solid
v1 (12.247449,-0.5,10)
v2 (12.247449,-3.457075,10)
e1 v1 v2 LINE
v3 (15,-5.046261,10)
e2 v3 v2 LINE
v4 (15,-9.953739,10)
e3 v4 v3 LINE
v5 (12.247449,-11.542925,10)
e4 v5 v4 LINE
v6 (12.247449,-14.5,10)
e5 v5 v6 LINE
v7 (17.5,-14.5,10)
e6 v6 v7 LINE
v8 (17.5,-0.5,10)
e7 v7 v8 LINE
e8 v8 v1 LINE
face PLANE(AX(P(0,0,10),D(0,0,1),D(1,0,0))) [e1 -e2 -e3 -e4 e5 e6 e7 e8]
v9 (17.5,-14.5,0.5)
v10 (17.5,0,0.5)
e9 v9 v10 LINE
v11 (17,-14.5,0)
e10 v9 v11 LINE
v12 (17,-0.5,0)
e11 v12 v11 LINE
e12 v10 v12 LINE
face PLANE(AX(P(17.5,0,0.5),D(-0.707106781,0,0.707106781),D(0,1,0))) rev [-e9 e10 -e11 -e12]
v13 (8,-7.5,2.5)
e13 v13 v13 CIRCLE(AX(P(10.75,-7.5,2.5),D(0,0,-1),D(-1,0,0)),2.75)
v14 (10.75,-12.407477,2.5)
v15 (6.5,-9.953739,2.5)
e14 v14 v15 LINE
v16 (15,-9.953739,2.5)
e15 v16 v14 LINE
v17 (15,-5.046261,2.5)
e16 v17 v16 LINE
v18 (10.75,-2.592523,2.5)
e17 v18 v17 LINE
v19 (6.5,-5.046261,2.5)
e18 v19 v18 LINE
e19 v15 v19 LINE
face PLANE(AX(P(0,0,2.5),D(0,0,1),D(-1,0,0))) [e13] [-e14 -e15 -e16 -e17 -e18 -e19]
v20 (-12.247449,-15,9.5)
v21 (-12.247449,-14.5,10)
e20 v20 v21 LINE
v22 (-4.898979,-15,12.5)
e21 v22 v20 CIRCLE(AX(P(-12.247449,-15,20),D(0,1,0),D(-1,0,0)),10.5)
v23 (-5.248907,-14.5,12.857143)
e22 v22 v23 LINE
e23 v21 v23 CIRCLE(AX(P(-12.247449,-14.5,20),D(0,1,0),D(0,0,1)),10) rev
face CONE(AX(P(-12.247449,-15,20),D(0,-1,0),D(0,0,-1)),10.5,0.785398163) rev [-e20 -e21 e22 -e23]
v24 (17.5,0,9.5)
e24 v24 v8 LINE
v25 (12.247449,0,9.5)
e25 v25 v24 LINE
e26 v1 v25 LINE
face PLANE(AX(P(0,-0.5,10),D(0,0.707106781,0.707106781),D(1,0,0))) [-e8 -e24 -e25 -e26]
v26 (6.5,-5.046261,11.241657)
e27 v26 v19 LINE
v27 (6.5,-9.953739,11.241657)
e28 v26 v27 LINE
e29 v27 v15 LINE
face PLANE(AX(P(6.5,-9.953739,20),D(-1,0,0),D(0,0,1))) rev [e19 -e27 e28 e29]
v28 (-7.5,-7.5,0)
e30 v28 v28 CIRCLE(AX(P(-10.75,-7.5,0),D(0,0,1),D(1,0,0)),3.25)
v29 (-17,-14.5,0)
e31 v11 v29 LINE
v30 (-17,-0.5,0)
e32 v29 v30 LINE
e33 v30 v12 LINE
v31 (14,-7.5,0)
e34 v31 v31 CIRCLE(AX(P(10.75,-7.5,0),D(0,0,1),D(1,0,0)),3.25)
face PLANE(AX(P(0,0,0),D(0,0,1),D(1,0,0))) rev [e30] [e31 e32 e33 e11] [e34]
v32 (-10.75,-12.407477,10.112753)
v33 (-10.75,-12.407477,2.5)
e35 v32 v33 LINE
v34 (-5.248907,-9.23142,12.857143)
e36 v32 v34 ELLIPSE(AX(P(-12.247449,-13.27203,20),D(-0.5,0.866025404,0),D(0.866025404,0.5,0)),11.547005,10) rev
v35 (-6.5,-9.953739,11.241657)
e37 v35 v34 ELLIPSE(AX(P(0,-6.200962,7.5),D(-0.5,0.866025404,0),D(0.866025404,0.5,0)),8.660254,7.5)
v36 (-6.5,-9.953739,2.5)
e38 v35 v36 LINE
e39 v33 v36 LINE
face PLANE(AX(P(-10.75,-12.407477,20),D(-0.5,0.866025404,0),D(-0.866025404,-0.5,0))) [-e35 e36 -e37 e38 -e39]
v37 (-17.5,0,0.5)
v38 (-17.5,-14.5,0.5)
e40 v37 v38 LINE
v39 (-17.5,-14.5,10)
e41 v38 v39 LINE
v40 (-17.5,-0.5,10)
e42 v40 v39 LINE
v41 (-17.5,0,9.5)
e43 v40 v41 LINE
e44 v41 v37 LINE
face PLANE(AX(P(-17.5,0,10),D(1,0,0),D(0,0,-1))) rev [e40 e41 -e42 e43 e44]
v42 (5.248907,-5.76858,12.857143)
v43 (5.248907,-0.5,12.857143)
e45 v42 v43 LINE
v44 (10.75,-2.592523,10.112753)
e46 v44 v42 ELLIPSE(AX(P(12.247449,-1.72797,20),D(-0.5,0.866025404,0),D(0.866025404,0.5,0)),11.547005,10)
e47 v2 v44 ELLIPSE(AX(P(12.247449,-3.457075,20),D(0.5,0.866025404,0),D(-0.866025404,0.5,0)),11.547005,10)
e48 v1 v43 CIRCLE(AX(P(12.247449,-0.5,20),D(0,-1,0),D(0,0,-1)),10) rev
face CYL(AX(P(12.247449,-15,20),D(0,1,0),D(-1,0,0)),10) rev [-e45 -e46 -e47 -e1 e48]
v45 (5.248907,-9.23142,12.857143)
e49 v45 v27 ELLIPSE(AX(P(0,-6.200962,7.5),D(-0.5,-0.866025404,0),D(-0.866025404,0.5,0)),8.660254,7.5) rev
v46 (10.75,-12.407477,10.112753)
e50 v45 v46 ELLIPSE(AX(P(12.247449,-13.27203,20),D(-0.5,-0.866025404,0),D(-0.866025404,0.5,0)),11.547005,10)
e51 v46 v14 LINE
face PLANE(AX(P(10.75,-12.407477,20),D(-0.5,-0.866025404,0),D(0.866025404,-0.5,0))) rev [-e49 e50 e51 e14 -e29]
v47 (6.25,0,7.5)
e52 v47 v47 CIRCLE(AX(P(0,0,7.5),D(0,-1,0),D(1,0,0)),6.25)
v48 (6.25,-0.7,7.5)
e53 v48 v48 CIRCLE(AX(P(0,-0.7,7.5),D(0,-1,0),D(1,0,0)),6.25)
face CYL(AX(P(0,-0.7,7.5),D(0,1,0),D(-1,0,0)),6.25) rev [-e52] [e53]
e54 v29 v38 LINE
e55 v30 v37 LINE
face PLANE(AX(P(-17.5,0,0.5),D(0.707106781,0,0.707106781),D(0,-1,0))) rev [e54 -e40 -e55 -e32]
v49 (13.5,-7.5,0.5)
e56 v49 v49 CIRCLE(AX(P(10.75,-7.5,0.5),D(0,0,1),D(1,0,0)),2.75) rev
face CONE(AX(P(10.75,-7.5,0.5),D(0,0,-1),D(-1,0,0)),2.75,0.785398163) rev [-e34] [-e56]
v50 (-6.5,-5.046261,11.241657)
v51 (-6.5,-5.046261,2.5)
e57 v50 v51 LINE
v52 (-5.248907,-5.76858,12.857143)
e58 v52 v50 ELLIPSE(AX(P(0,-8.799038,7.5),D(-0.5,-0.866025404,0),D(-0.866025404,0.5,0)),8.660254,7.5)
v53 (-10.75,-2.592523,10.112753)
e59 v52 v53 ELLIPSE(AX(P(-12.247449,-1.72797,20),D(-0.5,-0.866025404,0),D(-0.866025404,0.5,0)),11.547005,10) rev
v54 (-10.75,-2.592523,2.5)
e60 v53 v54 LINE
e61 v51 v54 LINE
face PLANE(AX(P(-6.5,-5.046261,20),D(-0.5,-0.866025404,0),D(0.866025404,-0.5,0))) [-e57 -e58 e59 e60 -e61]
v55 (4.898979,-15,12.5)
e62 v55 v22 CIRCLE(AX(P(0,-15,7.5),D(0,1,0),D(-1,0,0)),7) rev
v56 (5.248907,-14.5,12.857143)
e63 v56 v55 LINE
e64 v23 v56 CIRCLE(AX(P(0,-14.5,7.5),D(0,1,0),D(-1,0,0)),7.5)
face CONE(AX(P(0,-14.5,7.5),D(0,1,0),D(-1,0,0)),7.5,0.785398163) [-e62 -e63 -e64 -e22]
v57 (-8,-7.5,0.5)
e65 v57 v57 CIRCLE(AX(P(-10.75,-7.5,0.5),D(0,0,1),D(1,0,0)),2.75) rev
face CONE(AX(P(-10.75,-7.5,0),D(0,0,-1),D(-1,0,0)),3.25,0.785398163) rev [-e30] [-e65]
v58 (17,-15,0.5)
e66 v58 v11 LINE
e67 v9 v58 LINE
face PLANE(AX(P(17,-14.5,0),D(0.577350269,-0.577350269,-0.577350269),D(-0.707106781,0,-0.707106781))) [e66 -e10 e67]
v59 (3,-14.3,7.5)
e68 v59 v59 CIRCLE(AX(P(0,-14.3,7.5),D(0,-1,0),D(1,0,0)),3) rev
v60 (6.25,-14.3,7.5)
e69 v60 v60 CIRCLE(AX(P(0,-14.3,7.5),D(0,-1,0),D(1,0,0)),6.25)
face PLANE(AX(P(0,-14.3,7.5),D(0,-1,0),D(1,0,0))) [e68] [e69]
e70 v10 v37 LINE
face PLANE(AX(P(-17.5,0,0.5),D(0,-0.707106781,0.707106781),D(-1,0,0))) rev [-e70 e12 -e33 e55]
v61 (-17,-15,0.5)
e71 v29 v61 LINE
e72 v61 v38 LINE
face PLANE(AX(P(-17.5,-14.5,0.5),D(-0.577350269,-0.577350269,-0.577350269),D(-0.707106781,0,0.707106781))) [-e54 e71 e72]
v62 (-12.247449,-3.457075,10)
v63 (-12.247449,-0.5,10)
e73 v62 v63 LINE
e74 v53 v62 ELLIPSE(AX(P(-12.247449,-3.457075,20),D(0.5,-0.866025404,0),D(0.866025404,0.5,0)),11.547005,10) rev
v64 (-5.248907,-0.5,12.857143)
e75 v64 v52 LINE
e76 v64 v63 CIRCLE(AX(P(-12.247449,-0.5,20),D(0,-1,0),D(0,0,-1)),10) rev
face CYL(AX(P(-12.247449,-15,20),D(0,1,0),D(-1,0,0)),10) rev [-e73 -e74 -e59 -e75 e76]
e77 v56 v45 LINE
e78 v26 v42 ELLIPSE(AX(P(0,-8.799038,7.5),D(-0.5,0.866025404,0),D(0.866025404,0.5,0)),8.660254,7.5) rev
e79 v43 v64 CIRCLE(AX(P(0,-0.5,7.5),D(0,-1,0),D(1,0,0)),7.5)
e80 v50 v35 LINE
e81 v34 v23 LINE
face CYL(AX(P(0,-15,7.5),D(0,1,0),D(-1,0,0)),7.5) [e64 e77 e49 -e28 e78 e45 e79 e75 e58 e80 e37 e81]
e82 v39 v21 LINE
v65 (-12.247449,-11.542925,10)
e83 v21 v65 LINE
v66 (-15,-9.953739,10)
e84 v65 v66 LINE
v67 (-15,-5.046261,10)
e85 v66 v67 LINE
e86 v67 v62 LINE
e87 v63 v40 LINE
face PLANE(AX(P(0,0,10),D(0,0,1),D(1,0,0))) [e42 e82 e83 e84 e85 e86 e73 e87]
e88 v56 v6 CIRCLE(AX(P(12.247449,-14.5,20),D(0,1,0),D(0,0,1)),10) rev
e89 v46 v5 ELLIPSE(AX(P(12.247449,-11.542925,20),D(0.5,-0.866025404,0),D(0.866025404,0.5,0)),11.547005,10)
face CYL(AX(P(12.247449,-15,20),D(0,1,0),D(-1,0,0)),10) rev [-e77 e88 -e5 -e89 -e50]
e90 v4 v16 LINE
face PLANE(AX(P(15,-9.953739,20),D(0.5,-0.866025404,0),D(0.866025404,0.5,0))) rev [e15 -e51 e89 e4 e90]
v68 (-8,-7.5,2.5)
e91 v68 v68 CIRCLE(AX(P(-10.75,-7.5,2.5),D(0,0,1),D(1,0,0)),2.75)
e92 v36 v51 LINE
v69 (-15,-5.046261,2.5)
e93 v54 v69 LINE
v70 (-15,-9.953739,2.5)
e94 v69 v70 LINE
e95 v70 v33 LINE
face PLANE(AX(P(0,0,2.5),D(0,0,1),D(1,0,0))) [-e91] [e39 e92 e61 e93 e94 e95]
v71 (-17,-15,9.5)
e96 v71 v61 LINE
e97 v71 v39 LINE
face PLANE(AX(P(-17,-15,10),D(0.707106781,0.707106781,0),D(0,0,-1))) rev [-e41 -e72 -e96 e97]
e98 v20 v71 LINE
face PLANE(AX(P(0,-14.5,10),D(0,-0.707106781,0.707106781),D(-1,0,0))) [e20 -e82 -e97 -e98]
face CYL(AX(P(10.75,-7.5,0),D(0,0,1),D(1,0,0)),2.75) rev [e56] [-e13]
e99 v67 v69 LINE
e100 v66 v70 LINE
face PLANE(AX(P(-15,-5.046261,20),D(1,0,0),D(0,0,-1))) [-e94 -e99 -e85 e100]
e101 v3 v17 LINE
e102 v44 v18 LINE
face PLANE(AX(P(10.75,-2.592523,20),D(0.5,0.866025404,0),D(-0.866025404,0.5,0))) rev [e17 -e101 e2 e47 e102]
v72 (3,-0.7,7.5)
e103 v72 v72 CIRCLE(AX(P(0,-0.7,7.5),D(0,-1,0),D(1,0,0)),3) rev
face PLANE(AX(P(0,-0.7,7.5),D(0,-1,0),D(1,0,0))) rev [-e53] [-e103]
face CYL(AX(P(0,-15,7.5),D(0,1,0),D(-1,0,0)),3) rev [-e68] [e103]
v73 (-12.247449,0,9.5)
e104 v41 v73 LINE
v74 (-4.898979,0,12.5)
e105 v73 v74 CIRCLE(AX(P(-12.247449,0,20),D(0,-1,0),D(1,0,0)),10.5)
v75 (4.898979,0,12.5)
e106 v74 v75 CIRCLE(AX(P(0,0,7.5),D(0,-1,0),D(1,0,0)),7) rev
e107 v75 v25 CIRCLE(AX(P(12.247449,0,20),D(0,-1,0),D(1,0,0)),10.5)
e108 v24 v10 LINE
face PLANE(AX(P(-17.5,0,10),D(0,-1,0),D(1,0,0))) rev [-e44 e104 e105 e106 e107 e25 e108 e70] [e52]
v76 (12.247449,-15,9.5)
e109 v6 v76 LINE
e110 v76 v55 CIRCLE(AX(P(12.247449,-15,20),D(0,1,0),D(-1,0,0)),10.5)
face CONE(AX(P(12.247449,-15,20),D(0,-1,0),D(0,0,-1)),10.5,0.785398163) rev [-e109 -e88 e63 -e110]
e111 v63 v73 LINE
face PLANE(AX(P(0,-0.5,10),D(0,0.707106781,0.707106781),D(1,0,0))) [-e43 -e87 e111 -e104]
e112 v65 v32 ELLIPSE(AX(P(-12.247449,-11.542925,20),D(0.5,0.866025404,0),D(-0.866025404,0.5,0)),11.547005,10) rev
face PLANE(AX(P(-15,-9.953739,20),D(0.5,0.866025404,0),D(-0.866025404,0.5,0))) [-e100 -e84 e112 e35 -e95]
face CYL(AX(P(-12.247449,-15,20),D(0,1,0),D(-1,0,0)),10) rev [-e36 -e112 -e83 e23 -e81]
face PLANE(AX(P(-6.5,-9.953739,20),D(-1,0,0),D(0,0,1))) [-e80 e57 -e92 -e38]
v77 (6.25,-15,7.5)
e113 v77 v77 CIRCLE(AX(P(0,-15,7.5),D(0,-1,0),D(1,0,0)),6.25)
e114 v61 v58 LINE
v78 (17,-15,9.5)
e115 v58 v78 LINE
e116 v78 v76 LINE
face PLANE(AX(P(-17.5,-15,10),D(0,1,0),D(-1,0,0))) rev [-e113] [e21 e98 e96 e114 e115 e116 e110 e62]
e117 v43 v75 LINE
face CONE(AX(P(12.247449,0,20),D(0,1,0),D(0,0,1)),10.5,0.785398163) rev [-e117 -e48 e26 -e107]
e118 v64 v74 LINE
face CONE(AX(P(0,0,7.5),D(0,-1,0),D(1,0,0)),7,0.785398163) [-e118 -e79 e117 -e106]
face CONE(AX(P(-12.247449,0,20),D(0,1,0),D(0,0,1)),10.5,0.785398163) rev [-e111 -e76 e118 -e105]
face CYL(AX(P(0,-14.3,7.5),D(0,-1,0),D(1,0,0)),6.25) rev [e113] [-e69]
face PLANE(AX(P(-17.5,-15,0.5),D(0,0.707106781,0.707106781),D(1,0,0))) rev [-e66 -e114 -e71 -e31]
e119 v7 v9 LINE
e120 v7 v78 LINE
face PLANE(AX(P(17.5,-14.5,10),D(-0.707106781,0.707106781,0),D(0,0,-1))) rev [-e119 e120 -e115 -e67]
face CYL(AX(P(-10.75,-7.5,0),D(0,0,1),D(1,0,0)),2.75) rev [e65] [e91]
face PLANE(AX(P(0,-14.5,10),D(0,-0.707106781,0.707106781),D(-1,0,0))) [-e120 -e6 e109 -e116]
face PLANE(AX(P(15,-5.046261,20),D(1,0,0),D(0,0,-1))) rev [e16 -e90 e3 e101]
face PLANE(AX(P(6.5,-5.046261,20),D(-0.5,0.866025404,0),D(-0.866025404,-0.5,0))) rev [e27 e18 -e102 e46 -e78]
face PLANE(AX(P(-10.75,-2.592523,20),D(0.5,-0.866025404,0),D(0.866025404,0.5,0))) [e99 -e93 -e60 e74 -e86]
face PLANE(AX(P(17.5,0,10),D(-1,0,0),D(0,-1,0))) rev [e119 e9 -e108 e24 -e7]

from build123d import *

# Parameters (mm, degrees)
SKETCH1_W           = 35
SKETCH1_H           = 15
BOSS_EXTRUDE1_DEPTH = 10
SKETCH3_R           = 7.5
BOSS_EXTRUDE2_DEPTH = 15
CUT_EXTRUDE1_START  = -7.5
CUT_EXTRUDE1_DEPTH  = 17.5
SKETCH5_R           = 2.75
CUT_EXTRUDE3_DEPTH  = 27.220221204
SKETCH4_R           = 3
CUT_EXTRUDE2_DEPTH  = 28.5
FILLET1_R           = 10
SKETCH6_R           = 6.25
CUT_EXTRUDE4_DEPTH  = 0.7
CUT_EXTRUDE5_START  = -14.3
SKETCH6_3_R         = 6.25
CUT_EXTRUDE5_DEPTH  = 0.7
CHAMFER1_SIZE       = 0.5


with BuildPart() as part:
    # Sketch1 → Boss-Extrude1 (new body)
    with BuildSketch(Plane.XY):
        with Locations((0, -7.5)):
            Rectangle(SKETCH1_W, SKETCH1_H)
    extrude(amount=BOSS_EXTRUDE1_DEPTH)

    # Sketch3 → Boss-Extrude2 (add, through all)
    with BuildSketch(Plane(origin=(0, 0, 0), x_dir=(1, 0, 0), z_dir=(0, 1, 0))):
        with Locations((0, -7.5)):
            Circle(SKETCH3_R)
    extrude(amount=-BOSS_EXTRUDE2_DEPTH)

    # Sketch2 → Cut-Extrude1 (cut)
    with BuildSketch(Plane.XY.offset(10).offset(CUT_EXTRUDE1_START)):
        Polygon((-10.75, -12.407477288), (-6.5, -9.953738644), (-6.5, -5.046261356), (-10.75, -2.592522712), (-15, -5.046261356), (-15, -9.953738644), align=None)
    cut_extrude1 = extrude(amount=CUT_EXTRUDE1_DEPTH, mode=Mode.SUBTRACT)

    # Sketch5 → Cut-Extrude3 (cut, through all)
    with BuildSketch(Plane.XY.offset(2.5)):
        with Locations((-10.75, -7.5)):
            Circle(SKETCH5_R)
    cut_extrude3 = extrude(amount=-CUT_EXTRUDE3_DEPTH, mode=Mode.SUBTRACT)

    # Mirror1: Cut-Extrude1, Cut-Extrude3 across plane
    add(cut_extrude1.mirror(Plane(origin=(0, 0, 0), x_dir=(0, 0, 1), z_dir=(1, 0, 0))), mode=Mode.SUBTRACT)
    add(cut_extrude3.mirror(Plane(origin=(0, 0, 0), x_dir=(0, 0, 1), z_dir=(1, 0, 0))), mode=Mode.SUBTRACT)

    # Sketch4 → Cut-Extrude2 (cut, through all)
    with BuildSketch(Plane(origin=(0, 0, 0), x_dir=(1, 0, 0), z_dir=(0, 1, 0))):
        with Locations(Location((0, -7.5, 0), (0, 0, 180))):
            Circle(SKETCH4_R)
    extrude(amount=-CUT_EXTRUDE2_DEPTH, mode=Mode.SUBTRACT)

    # Fillet1
    # the kernel refuses this fillet: 10 mm, written as the material it adds along each edge
    with BuildSketch(Plane(origin=(7.071067812, -17.657507456, 10), x_dir=(-0.5377110557824625, 0, 0.8431291837490323), z_dir=(0, 1, 0))) as fillet1_piece_1_section:
        with BuildLine():
            CenterArc((5.647894598, 9.741468363), FILLET1_R, 212.527956019, 44.415308597)
            Line((-2.78339724, 4.364357805), (0, 0))
            ThreePointArc((0, 0), (1.694368379, 0.193898728), (3.388736759, 0))
        make_face()
    fillet1_piece_1 = extrude(amount=30.598459711, mode=Mode.PRIVATE)
    fillet1_piece_1 = split(fillet1_piece_1, bisect_by=Plane(origin=(6.425815385, -15, 11.617899052), z_dir=(0, 1, 0)), keep=Keep.TOP, mode=Mode.PRIVATE)
    fillet1_piece_1 = split(fillet1_piece_1, bisect_by=Plane(origin=(8.608682251, -11.17118691, 11.617899052), z_dir=(-0.49999999999999994, -0.8660254037844389, 0)), keep=Keep.TOP, mode=Mode.PRIVATE)
    add(fillet1_piece_1)
    with BuildSketch(Plane(origin=(7.071067812, -17.657507456, 10), x_dir=(-0.5377110557824625, 0, 0.8431291837490323), z_dir=(0, 1, 0))) as fillet1_piece_2_section:
        with BuildLine():
            CenterArc((5.647894598, 9.741468363), FILLET1_R, 212.527956019, 44.415308597)
            Line((-2.78339724, 4.364357805), (0, 0))
            ThreePointArc((0, 0), (1.694368379, 0.193898728), (3.388736759, 0))
        make_face()
    fillet1_piece_2 = extrude(amount=30.598459711, mode=Mode.PRIVATE)
    fillet1_piece_2 = split(fillet1_piece_2, bisect_by=Plane(origin=(11.198944739, -12.666675654, 10.022508618), z_dir=(0.49999999999999994, 0.8660254037844389, 0)), keep=Keep.TOP, mode=Mode.PRIVATE)
    fillet1_piece_2 = split(fillet1_piece_2, bisect_by=Plane(origin=(11.198944739, -12.148278922, 10.022508618), z_dir=(0.49999999999999994, -0.8660254037844389, 0)), keep=Keep.TOP, mode=Mode.PRIVATE)
    add(fillet1_piece_2)
    with BuildSketch(Plane(origin=(7.071067812, -17.657507456, 10), x_dir=(-0.5377110557824625, 0, 0.8431291837490323), z_dir=(0, 1, 0))) as fillet1_piece_3_section:
        with BuildLine():
            CenterArc((5.647894598, 9.741468363), FILLET1_R, 212.527956019, 44.415308597)
            Line((-2.78339724, 4.364357805), (0, 0))
            ThreePointArc((0, 0), (1.694368379, 0.193898728), (3.388736759, 0))
        make_face()
    fillet1_piece_3 = extrude(amount=17.657507456, mode=Mode.PRIVATE)
    fillet1_piece_3 = split(fillet1_piece_3, bisect_by=Plane(origin=(7.311033897, -4.578010717, 11.885204444), z_dir=(-0.5000000000000009, 0.8660254037844383, 0)), keep=Keep.TOP, mode=Mode.PRIVATE)
    add(fillet1_piece_3)
    with BuildSketch(Plane(origin=(7.071067812, -17.657507456, 10), x_dir=(-0.5377110557824625, 0, 0.8431291837490323), z_dir=(0, 1, 0))) as fillet1_piece_4_section:
        with BuildLine():
            CenterArc((5.647894598, 9.741468363), FILLET1_R, 212.527956019, 44.415308597)
            Line((-2.78339724, 4.364357805), (0, 0))
            ThreePointArc((0, 0), (1.694368379, 0.193898728), (3.388736759, 0))
        make_face()
    fillet1_piece_4 = extrude(amount=30.598459711, mode=Mode.PRIVATE)
    fillet1_piece_4 = split(fillet1_piece_4, bisect_by=Plane(origin=(11.198944739, -2.333324346, 10.022508618), z_dir=(0.5000000000000009, -0.8660254037844383, 0)), keep=Keep.TOP, mode=Mode.PRIVATE)
    fillet1_piece_4 = split(fillet1_piece_4, bisect_by=Plane(origin=(11.198944739, -2.851721078, 10.022508618), z_dir=(0.5000000000000001, 0.8660254037844386, 0)), keep=Keep.TOP, mode=Mode.PRIVATE)
    add(fillet1_piece_4)
    with BuildSketch(Plane(origin=(-7.071067812, -17.657507456, 10), x_dir=(-1, 0, 0), z_dir=(0, 1, 0))) as fillet1_piece_5_section:
        with BuildLine():
            CenterArc((5.176380902, 10), FILLET1_R, 225.584691403, 44.415308597)
            ThreePointArc((-1.82216122, 2.857142857), (-0.747598934, 1.532832918), (0, 0))
            Line((0, 0), (5.176380902, 0))
        make_face()
    fillet1_piece_5 = extrude(amount=30.598459711, mode=Mode.PRIVATE)
    fillet1_piece_5 = split(fillet1_piece_5, bisect_by=Plane(origin=(-8.687576495, -15, 10.380647158), z_dir=(0, 1, 0)), keep=Keep.TOP, mode=Mode.PRIVATE)
    fillet1_piece_5 = split(fillet1_piece_5, bisect_by=Plane(origin=(-10.026133402, -11.989552713, 10.380647158), z_dir=(0.49999999999999994, -0.8660254037844389, 0)), keep=Keep.TOP, mode=Mode.PRIVATE)
    add(fillet1_piece_5)
    with BuildSketch(Plane(origin=(-7.071067812, -17.657507456, 10), x_dir=(-1, 0, 0), z_dir=(0, 1, 0))) as fillet1_piece_6_section:
        with BuildLine():
            CenterArc((5.176380902, 10), FILLET1_R, 225.584691403, 44.415308597)
            ThreePointArc((-1.82216122, 2.857142857), (-0.747598934, 1.532832918), (0, 0))
            Line((0, 0), (5.176380902, 0))
        make_face()
    fillet1_piece_6 = extrude(amount=30.598459711, mode=Mode.PRIVATE)
    fillet1_piece_6 = split(fillet1_piece_6, bisect_by=Plane(origin=(-11.19894474, -12.666675654, 10.022508618), z_dir=(-0.49999999999999994, 0.8660254037844389, 0)), keep=Keep.TOP, mode=Mode.PRIVATE)
    fillet1_piece_6 = split(fillet1_piece_6, bisect_by=Plane(origin=(-11.19894474, -12.148278922, 10.022508618), z_dir=(-0.49999999999999994, -0.8660254037844389, 0)), keep=Keep.TOP, mode=Mode.PRIVATE)
    add(fillet1_piece_6)
    with BuildSketch(Plane(origin=(-7.071067812, -17.657507456, 10), x_dir=(-1, 0, 0), z_dir=(0, 1, 0))) as fillet1_piece_7_section:
        with BuildLine():
            CenterArc((5.176380902, 10), FILLET1_R, 225.584691403, 44.415308597)
            ThreePointArc((-1.82216122, 2.857142857), (-0.747598934, 1.532832918), (0, 0))
            Line((0, 0), (5.176380902, 0))
        make_face()
    fillet1_piece_7 = extrude(amount=17.657507456, mode=Mode.PRIVATE)
    fillet1_piece_7 = split(fillet1_piece_7, bisect_by=Plane(origin=(-8.42018253, -3.937643455, 10.662510622), z_dir=(0.5000000000000009, 0.8660254037844383, 0)), keep=Keep.TOP, mode=Mode.PRIVATE)
    add(fillet1_piece_7)
    with BuildSketch(Plane(origin=(-7.071067812, -17.657507456, 10), x_dir=(-1, 0, 0), z_dir=(0, 1, 0))) as fillet1_piece_8_section:
        with BuildLine():
            CenterArc((5.176380902, 10), FILLET1_R, 225.584691403, 44.415308597)
            ThreePointArc((-1.82216122, 2.857142857), (-0.747598934, 1.532832918), (0, 0))
            Line((0, 0), (5.176380902, 0))
        make_face()
    fillet1_piece_8 = extrude(amount=30.598459711, mode=Mode.PRIVATE)
    fillet1_piece_8 = split(fillet1_piece_8, bisect_by=Plane(origin=(-11.19894474, -2.851721078, 10.022508618), z_dir=(-0.5000000000000001, 0.8660254037844386, 0)), keep=Keep.TOP, mode=Mode.PRIVATE)
    fillet1_piece_8 = split(fillet1_piece_8, bisect_by=Plane(origin=(-11.19894474, -2.333324346, 10.022508618), z_dir=(-0.5000000000000009, -0.8660254037844383, 0)), keep=Keep.TOP, mode=Mode.PRIVATE)
    add(fillet1_piece_8)
    with BuildSketch(Plane(origin=(-7.071067812, -15, 10), x_dir=(-1, 0, 0), z_dir=(0, 1, 0))) as fillet1_piece_9_section:
        with BuildLine():
            CenterArc((5.176380902, 10), FILLET1_R, 225.584691403, 44.415308597)
            ThreePointArc((-1.82216122, 2.857142857), (-0.747598934, 1.532832918), (0, 0))
            Line((0, 0), (5.176380902, 0))
        make_face()
    fillet1_piece_9 = extrude(amount=17.657507456, mode=Mode.PRIVATE)
    fillet1_piece_9 = split(fillet1_piece_9, bisect_by=Plane(origin=(-10.026133402, -11.989552713, 10.380647158), z_dir=(0.49999999999999994, -0.8660254037844389, 0)), keep=Keep.TOP, mode=Mode.PRIVATE)
    add(fillet1_piece_9)
    with BuildSketch(Plane(origin=(-7.071067812, -27.940952255, 10), x_dir=(-1, 0, 0), z_dir=(0, 1, 0))) as fillet1_piece_10_section:
        with BuildLine():
            CenterArc((5.176380902, 10), FILLET1_R, 225.584691403, 44.415308597)
            ThreePointArc((-1.82216122, 2.857142857), (-0.747598934, 1.532832918), (0, 0))
            Line((0, 0), (5.176380902, 0))
        make_face()
    fillet1_piece_10 = extrude(amount=30.598459711, mode=Mode.PRIVATE)
    fillet1_piece_10 = split(fillet1_piece_10, bisect_by=Plane(origin=(-11.19894474, -12.666675654, 10.022508618), z_dir=(-0.49999999999999994, 0.8660254037844389, 0)), keep=Keep.TOP, mode=Mode.PRIVATE)
    fillet1_piece_10 = split(fillet1_piece_10, bisect_by=Plane(origin=(-11.19894474, -12.148278922, 10.022508618), z_dir=(-0.49999999999999994, -0.8660254037844389, 0)), keep=Keep.TOP, mode=Mode.PRIVATE)
    add(fillet1_piece_10)
    with BuildSketch(Plane(origin=(-7.071067812, -27.940952255, 10), x_dir=(-1, 0, 0), z_dir=(0, 1, 0))) as fillet1_piece_11_section:
        with BuildLine():
            CenterArc((5.176380902, 10), FILLET1_R, 225.584691403, 44.415308597)
            ThreePointArc((-1.82216122, 2.857142857), (-0.747598934, 1.532832918), (0, 0))
            Line((0, 0), (5.176380902, 0))
        make_face()
    fillet1_piece_11 = extrude(amount=30.598459711, mode=Mode.PRIVATE)
    fillet1_piece_11 = split(fillet1_piece_11, bisect_by=Plane(origin=(-7.643576707, 0, 10.662510622), z_dir=(0, -1, 0)), keep=Keep.TOP, mode=Mode.PRIVATE)
    fillet1_piece_11 = split(fillet1_piece_11, bisect_by=Plane(origin=(-8.42018253, -3.937643455, 10.662510622), z_dir=(0.5000000000000009, 0.8660254037844383, 0)), keep=Keep.TOP, mode=Mode.PRIVATE)
    add(fillet1_piece_11)
    with BuildSketch(Plane(origin=(-7.071067812, -27.940952255, 10), x_dir=(-1, 0, 0), z_dir=(0, 1, 0))) as fillet1_piece_12_section:
        with BuildLine():
            CenterArc((5.176380902, 10), FILLET1_R, 225.584691403, 44.415308597)
            ThreePointArc((-1.82216122, 2.857142857), (-0.747598934, 1.532832918), (0, 0))
            Line((0, 0), (5.176380902, 0))
        make_face()
    fillet1_piece_12 = extrude(amount=30.598459711, mode=Mode.PRIVATE)
    fillet1_piece_12 = split(fillet1_piece_12, bisect_by=Plane(origin=(-11.19894474, -2.851721078, 10.022508618), z_dir=(-0.5000000000000001, 0.8660254037844386, 0)), keep=Keep.TOP, mode=Mode.PRIVATE)
    fillet1_piece_12 = split(fillet1_piece_12, bisect_by=Plane(origin=(-11.19894474, -2.333324346, 10.022508618), z_dir=(-0.5000000000000009, -0.8660254037844383, 0)), keep=Keep.TOP, mode=Mode.PRIVATE)
    add(fillet1_piece_12)
    with BuildSketch(Plane(origin=(7.071067812, -15, 10), x_dir=(-0.537711055782462, 0, 0.8431291837490327), z_dir=(0, 1, 0))) as fillet1_piece_13_section:
        with BuildLine():
            CenterArc((5.647894598, 9.741468363), FILLET1_R, 212.527956019, 44.415308597)
            Line((-2.78339724, 4.364357805), (0, 0))
            ThreePointArc((0, 0), (1.694368379, 0.193898728), (3.388736759, 0))
        make_face()
    fillet1_piece_13 = extrude(amount=17.657507456, mode=Mode.PRIVATE)
    fillet1_piece_13 = split(fillet1_piece_13, bisect_by=Plane(origin=(8.608682251, -11.17118691, 11.617899052), z_dir=(-0.49999999999999994, -0.8660254037844389, 0)), keep=Keep.TOP, mode=Mode.PRIVATE)
    add(fillet1_piece_13)
    with BuildSketch(Plane(origin=(7.071067812, -27.940952255, 10), x_dir=(-0.5377110557824618, 0, 0.8431291837490328), z_dir=(0, 1, 0))) as fillet1_piece_14_section:
        with BuildLine():
            CenterArc((5.647894598, 9.741468363), FILLET1_R, 212.527956019, 44.415308597)
            Line((-2.78339724, 4.364357805), (0, 0))
            ThreePointArc((0, 0), (1.694368379, 0.193898728), (3.388736759, 0))
        make_face()
    fillet1_piece_14 = extrude(amount=30.598459711, mode=Mode.PRIVATE)
    fillet1_piece_14 = split(fillet1_piece_14, bisect_by=Plane(origin=(11.198944739, -12.666675654, 10.022508618), z_dir=(0.49999999999999994, 0.8660254037844389, 0)), keep=Keep.TOP, mode=Mode.PRIVATE)
    fillet1_piece_14 = split(fillet1_piece_14, bisect_by=Plane(origin=(11.198944739, -12.148278922, 10.022508618), z_dir=(0.49999999999999994, -0.8660254037844389, 0)), keep=Keep.TOP, mode=Mode.PRIVATE)
    add(fillet1_piece_14)
    with BuildSketch(Plane(origin=(7.071067812, -27.940952255, 10), x_dir=(-0.5377110557824618, 0, 0.8431291837490328), z_dir=(0, 1, 0))) as fillet1_piece_15_section:
        with BuildLine():
            CenterArc((5.647894598, 9.741468363), FILLET1_R, 212.527956019, 44.415308597)
            Line((-2.78339724, 4.364357805), (0, 0))
            ThreePointArc((0, 0), (1.694368379, 0.193898728), (3.388736759, 0))
        make_face()
    fillet1_piece_15 = extrude(amount=30.598459711, mode=Mode.PRIVATE)
    fillet1_piece_15 = split(fillet1_piece_15, bisect_by=Plane(origin=(6.186931612, 0, 11.885204444), z_dir=(0, -1, 0)), keep=Keep.TOP, mode=Mode.PRIVATE)
    fillet1_piece_15 = split(fillet1_piece_15, bisect_by=Plane(origin=(7.311033897, -4.578010717, 11.885204444), z_dir=(-0.5000000000000009, 0.8660254037844383, 0)), keep=Keep.TOP, mode=Mode.PRIVATE)
    add(fillet1_piece_15)
    with BuildSketch(Plane(origin=(7.071067812, -27.940952255, 10), x_dir=(-0.5377110557824618, 0, 0.8431291837490328), z_dir=(0, 1, 0))) as fillet1_piece_16_section:
        with BuildLine():
            CenterArc((5.647894598, 9.741468363), FILLET1_R, 212.527956019, 44.415308597)
            Line((-2.78339724, 4.364357805), (0, 0))
            ThreePointArc((0, 0), (1.694368379, 0.193898728), (3.388736759, 0))
        make_face()
    fillet1_piece_16 = extrude(amount=30.598459711, mode=Mode.PRIVATE)
    fillet1_piece_16 = split(fillet1_piece_16, bisect_by=Plane(origin=(11.198944739, -2.333324346, 10.022508618), z_dir=(0.5000000000000009, -0.8660254037844383, 0)), keep=Keep.TOP, mode=Mode.PRIVATE)
    fillet1_piece_16 = split(fillet1_piece_16, bisect_by=Plane(origin=(11.198944739, -2.851721078, 10.022508618), z_dir=(0.5000000000000001, 0.8660254037844386, 0)), keep=Keep.TOP, mode=Mode.PRIVATE)
    add(fillet1_piece_16)

    # Sketch6 → Cut-Extrude4 (cut)
    with BuildSketch(Plane.XZ.offset(15)):
        with Locations((0, 7.5)):
            Circle(SKETCH6_R)
    extrude(amount=-CUT_EXTRUDE4_DEPTH, mode=Mode.SUBTRACT)

    # Sketch6<3> → Cut-Extrude5 (cut)
    with BuildSketch(Plane.XZ.offset(15).offset(CUT_EXTRUDE5_START)):
        with Locations((0, 7.5)):
            Circle(SKETCH6_3_R)
    extrude(amount=-CUT_EXTRUDE5_DEPTH, mode=Mode.SUBTRACT)

    # Chamfer1
    chamfer1_edges = [part.edges().sort_by_distance(p)[0] for p in [
        (8.467803984, 0, 10.741799002),
        (8.467803984, -15, 10.741799002),
        (-8.467803984, -15, 10.741799002),
        (-8.467803984, 0, 10.741799002),
        (14.873724357, 0, 10),
        (0, 0, 0),
        (17.5, -7.5, 0),
        (0, -15, 0),
        (-13.5, -7.5, 0),
        (-17.5, -7.5, 0),
        (-14.873724357, -15, 10),
        (17.5, -15, 5),
        (-17.5, -15, 5),
        (13.5, -7.5, 0),
        (0, 0, 15),
        (0, -15, 15),
        (14.873724357, -15, 10),
        (-14.873724357, 0, 10),
    ]]
    chamfer(chamfer1_edges, length=CHAMFER1_SIZE)


solid = part.part
